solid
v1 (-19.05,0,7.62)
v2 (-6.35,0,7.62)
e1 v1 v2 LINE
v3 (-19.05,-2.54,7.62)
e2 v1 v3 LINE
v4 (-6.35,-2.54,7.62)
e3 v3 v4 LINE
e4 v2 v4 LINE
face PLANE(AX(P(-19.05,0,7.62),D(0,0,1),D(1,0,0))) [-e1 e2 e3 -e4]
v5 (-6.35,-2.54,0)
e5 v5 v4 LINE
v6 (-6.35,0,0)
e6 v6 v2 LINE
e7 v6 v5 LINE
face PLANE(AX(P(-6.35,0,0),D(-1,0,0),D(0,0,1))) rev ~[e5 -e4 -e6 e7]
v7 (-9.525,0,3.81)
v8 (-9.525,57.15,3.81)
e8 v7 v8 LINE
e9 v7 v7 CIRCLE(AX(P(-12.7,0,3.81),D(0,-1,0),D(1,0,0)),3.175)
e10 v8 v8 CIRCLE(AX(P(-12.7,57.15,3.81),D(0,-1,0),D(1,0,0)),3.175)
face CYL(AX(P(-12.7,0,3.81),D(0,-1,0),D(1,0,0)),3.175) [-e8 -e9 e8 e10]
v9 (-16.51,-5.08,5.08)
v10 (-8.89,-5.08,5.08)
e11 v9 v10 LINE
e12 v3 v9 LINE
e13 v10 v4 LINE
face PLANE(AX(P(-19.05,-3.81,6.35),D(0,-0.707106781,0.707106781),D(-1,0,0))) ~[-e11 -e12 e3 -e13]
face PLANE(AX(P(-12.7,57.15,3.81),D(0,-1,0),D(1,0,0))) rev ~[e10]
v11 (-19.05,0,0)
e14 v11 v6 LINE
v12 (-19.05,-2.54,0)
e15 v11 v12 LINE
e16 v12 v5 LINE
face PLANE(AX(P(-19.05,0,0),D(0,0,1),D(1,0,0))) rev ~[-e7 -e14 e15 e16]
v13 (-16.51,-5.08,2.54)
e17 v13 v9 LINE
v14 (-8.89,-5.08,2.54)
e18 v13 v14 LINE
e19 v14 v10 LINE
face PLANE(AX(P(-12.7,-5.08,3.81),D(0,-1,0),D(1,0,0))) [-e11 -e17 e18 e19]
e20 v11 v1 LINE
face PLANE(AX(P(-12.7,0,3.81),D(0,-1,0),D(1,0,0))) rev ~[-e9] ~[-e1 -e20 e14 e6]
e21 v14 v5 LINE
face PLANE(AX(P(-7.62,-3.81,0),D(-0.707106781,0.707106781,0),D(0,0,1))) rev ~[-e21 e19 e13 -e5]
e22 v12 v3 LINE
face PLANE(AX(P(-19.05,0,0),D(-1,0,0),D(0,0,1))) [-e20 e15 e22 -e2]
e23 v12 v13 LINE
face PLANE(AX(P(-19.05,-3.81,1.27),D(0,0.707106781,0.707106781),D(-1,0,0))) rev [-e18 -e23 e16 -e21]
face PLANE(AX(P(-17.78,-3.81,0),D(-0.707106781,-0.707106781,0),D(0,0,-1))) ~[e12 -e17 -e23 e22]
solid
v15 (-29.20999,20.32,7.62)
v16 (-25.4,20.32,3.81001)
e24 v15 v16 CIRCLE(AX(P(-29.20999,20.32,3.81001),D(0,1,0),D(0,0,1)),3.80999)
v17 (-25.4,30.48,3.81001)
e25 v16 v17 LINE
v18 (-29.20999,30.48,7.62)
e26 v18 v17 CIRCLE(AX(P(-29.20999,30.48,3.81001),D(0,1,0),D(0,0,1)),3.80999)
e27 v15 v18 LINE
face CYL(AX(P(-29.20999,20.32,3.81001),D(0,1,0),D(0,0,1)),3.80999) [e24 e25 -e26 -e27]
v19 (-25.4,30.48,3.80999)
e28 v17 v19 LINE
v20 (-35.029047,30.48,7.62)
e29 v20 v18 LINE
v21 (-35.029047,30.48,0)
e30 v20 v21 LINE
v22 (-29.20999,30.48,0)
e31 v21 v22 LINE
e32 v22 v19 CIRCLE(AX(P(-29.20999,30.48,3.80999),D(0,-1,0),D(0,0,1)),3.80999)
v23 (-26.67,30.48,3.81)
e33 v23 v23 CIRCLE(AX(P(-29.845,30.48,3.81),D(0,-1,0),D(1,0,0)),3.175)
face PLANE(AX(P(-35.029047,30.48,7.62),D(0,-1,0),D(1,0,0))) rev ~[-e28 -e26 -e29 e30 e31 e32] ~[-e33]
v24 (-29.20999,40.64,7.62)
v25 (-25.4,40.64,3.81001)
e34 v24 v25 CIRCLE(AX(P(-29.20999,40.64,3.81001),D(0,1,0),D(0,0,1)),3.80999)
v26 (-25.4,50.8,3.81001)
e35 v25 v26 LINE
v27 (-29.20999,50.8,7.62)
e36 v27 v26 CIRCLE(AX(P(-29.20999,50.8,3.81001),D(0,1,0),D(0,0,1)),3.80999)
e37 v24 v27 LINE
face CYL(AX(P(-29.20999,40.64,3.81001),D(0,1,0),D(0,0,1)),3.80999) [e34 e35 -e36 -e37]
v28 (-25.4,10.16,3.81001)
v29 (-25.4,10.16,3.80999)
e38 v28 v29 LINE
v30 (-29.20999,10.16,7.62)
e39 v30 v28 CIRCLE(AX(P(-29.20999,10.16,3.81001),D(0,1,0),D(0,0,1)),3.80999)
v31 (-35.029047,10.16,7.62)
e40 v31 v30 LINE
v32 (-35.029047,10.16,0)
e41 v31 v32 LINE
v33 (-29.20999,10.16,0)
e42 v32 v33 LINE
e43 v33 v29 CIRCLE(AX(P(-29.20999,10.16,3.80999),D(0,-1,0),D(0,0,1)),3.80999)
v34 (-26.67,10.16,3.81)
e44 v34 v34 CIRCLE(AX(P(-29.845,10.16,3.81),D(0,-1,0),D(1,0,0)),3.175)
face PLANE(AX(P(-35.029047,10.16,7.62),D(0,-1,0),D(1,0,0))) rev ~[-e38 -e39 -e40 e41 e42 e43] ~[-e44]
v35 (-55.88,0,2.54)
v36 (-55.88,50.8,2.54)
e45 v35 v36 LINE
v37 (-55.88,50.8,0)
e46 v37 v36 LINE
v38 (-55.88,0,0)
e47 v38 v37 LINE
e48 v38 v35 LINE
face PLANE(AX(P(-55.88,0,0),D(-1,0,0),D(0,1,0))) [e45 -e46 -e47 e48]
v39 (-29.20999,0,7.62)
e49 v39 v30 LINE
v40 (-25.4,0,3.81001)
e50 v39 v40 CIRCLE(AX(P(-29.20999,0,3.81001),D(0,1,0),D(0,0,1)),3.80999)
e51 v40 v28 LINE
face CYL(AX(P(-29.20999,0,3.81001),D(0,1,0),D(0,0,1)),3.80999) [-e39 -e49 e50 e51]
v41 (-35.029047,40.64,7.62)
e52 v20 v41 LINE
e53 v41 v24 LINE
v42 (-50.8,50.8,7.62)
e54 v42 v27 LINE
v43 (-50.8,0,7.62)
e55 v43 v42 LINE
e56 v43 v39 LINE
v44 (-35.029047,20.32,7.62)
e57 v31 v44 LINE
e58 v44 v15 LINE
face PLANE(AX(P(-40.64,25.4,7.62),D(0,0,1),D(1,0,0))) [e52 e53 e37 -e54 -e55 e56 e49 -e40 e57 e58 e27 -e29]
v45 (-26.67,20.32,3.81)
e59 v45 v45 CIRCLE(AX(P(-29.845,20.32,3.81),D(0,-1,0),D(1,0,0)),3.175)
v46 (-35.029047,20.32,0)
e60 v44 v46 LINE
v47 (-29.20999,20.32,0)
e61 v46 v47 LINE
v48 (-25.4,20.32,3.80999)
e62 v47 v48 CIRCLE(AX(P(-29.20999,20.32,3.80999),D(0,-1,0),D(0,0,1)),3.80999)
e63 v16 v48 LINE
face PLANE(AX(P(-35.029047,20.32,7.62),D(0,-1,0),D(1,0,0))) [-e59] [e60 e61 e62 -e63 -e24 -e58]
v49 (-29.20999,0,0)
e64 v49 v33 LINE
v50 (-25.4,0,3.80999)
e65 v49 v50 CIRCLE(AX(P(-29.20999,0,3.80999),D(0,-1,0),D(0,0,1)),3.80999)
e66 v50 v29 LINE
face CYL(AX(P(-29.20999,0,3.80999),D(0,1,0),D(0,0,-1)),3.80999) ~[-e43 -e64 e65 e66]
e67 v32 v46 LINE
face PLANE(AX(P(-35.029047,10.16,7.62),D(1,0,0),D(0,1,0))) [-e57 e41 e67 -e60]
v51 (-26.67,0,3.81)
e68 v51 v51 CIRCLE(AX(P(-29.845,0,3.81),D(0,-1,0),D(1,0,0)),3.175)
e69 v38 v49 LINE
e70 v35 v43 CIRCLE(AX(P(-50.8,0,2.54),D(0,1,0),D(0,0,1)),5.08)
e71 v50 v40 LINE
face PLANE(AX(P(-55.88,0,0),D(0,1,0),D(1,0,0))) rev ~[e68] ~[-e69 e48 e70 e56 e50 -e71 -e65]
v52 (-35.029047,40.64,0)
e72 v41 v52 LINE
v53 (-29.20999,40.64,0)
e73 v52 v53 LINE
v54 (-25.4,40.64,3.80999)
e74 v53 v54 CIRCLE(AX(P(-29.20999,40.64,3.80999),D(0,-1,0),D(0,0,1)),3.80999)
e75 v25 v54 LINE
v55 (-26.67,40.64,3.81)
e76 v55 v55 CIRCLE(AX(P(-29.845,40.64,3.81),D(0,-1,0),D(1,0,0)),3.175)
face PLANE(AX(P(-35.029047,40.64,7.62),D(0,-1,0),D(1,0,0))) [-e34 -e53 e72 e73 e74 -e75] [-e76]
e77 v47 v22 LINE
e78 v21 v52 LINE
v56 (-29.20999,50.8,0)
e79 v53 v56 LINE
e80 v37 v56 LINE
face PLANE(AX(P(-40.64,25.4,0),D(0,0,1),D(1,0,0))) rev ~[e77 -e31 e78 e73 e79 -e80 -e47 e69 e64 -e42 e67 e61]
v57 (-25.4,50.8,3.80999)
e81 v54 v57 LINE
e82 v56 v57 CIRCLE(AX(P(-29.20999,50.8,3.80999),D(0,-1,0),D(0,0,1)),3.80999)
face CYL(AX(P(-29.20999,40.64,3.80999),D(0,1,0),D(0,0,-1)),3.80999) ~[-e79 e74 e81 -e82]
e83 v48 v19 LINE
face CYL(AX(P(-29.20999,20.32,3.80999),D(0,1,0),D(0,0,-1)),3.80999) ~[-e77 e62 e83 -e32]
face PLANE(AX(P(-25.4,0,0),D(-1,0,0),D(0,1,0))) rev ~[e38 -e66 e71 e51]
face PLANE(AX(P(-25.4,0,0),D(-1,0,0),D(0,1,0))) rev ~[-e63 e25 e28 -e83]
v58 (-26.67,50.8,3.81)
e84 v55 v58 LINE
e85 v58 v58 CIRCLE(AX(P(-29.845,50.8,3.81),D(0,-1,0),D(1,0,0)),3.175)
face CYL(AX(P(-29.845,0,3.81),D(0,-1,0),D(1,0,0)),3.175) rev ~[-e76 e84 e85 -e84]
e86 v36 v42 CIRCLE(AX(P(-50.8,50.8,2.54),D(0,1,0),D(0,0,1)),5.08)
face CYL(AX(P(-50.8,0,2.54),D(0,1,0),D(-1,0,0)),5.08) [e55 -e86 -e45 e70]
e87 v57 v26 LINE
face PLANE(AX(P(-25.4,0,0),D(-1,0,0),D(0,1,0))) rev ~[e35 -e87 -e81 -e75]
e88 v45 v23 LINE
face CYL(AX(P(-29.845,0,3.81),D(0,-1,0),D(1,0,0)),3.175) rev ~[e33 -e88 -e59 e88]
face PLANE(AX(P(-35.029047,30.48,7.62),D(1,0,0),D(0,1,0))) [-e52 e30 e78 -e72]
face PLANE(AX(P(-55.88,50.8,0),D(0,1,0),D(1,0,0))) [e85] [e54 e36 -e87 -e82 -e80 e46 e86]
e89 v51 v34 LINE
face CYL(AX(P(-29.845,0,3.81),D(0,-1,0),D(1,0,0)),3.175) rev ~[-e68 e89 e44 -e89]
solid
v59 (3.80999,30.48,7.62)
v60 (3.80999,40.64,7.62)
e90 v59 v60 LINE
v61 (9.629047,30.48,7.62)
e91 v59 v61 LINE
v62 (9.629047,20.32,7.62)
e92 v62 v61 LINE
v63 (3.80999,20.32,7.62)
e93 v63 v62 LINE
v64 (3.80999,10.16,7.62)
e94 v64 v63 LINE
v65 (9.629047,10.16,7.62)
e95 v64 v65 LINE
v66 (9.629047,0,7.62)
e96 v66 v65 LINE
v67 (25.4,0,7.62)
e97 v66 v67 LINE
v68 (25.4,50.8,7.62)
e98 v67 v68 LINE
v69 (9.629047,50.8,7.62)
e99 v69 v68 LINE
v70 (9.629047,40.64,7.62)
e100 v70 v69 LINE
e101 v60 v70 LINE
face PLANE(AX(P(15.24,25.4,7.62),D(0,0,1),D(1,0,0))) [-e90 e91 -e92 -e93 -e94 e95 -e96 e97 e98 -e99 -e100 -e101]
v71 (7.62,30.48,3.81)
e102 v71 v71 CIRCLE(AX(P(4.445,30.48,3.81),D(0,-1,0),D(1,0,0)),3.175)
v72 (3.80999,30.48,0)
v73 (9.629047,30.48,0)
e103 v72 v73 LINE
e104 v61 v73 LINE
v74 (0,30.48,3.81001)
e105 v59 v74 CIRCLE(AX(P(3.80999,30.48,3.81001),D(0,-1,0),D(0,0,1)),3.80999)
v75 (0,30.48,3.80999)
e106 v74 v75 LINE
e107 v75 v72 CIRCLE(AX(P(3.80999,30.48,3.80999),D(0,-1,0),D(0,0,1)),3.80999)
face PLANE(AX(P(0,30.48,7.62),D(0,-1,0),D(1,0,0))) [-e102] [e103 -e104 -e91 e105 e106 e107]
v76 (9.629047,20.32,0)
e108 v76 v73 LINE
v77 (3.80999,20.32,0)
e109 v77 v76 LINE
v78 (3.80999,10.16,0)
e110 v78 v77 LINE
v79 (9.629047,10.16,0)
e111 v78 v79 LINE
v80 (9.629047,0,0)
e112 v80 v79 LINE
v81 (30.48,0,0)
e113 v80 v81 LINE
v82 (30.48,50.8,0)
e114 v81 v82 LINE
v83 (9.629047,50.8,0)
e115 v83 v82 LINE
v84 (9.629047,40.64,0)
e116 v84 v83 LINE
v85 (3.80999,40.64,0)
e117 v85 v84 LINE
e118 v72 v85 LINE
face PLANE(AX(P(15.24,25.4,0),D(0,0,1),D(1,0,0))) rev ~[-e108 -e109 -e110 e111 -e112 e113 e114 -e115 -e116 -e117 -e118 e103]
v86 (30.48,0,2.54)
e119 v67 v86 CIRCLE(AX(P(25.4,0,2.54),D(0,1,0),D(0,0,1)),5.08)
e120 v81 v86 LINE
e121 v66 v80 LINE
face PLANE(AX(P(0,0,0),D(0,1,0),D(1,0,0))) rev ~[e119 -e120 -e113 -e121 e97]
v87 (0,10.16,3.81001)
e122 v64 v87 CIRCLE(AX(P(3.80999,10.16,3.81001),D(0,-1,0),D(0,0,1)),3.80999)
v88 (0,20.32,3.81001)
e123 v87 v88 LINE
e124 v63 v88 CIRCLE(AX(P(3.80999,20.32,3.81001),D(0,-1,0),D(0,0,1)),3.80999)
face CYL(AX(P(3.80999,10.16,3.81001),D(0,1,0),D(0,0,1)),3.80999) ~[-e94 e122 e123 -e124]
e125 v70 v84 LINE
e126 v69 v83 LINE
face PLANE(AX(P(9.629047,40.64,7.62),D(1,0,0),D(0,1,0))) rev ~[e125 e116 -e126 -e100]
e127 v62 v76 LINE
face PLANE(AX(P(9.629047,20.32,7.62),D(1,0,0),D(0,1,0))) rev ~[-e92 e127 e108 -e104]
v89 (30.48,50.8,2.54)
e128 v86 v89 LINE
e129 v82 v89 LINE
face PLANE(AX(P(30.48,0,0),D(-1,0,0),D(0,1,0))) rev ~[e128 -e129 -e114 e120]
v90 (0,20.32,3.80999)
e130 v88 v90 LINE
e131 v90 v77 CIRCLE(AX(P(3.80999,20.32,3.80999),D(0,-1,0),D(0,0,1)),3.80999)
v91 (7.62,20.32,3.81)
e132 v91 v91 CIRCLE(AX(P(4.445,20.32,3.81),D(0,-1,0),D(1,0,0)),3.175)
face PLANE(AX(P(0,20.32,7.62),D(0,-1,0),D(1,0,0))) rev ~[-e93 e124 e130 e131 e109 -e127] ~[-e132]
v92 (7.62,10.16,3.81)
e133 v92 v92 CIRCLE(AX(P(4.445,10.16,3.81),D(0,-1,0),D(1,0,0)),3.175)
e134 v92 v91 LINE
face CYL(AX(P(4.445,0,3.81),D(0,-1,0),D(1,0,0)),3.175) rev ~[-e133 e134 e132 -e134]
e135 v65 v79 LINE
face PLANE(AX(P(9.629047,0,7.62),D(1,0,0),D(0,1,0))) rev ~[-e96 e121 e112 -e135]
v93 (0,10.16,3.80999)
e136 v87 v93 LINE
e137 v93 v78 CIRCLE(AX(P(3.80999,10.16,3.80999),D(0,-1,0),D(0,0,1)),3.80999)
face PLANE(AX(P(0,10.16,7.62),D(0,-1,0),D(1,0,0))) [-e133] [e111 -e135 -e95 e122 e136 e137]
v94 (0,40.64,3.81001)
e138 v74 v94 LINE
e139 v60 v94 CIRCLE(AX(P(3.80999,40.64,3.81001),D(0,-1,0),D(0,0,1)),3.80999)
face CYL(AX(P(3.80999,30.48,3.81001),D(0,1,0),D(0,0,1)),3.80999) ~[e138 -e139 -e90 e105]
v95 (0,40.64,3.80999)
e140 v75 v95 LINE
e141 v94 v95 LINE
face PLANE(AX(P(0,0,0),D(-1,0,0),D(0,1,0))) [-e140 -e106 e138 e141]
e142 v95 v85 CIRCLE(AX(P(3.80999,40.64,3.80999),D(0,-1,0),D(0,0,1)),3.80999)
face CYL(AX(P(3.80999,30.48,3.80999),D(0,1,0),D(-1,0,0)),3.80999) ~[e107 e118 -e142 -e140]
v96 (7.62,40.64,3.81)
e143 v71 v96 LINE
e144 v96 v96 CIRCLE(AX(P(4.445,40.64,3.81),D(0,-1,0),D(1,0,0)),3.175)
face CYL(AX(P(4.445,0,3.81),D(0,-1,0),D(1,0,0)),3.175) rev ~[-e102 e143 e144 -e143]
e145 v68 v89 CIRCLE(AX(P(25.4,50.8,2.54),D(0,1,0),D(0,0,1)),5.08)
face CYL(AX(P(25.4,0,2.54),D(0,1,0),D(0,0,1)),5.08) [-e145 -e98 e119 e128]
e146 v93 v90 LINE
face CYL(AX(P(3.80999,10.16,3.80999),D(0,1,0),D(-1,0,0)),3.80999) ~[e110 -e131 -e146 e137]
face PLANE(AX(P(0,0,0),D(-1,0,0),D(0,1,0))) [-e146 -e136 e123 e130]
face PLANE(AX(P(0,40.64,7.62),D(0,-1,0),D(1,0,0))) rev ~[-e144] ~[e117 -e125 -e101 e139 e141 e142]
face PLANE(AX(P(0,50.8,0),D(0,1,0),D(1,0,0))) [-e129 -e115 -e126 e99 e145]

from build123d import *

# Parameters (mm, degrees)
F0_W      = 30.48
F0_H      = 50.8
F1_DEPTH  = 7.62
F2_R      = 3.175
F3_DEPTH  = 50.8
F4_W      = 9.6290465444
F4_H      = 10.16
F5_DEPTH  = 7.62
F6_DEPTH  = 7.62
F7_R      = 5.08
F7_2_R    = 5.08
F8_R      = 3.80999
F8_2_R    = 3.80999
F9_W      = 12.7
F9_H      = 7.62
F9_R      = 3.175
F10_DEPTH = 5.08
F11_DEPTH = 57.15
F12_SIZE  = 2.54


# Not quite as in the source:
# - a fillet or chamfer is up to 0.001 mm smaller than in the source, because OpenCascade refuses the exact size


with BuildPart() as f1:
    # F0 (on Top) → F1 (new body)
    with BuildSketch(Plane.XY):
        with Locations((15.24, 25.4)):
            Rectangle(F0_W, F0_H)
    extrude(amount=F1_DEPTH)


with BuildPart() as f1b:
    # F0 (on Top) → F1, piece 2 (new body)
    with BuildSketch(Plane.XY):
        with Locations((-40.64, 25.4)):
            Rectangle(F0_W, F0_H)
    extrude(amount=F1_DEPTH)


with BuildPart() as f3_tool:
    # F2 (on face) → F3 (new body, through all)
    with BuildSketch(Plane.XZ):
        with Locations((4.445, 3.81)):
            Circle(F2_R)
        with Locations((-29.845, 3.81)):
            Circle(F2_R)
    extrude(amount=-F3_DEPTH)


with BuildPart() as f1_1:
    add(f1.part)

    # F3: cut by f3_tool
    add(f3_tool.part, mode=Mode.SUBTRACT)

    # F4 (on face) → F5 (cut, through all)
    with BuildSketch(Plane.XY.offset(7.62)):
        with Locations((4.8145232722, 5.08)):
            Rectangle(F4_W, F4_H)
        with Locations((4.8145232722, 25.4)):
            Rectangle(F4_W, F4_H)
        with Locations((4.8145232722, 45.72)):
            Rectangle(F4_W, F4_H)
    extrude(amount=-F5_DEPTH, mode=Mode.SUBTRACT)

    # F7#2
    f7_2_edges = [f1_1.edges().sort_by_distance(p)[0] for p in [
        (30.48, 25.4, 7.62),
    ]]
    fillet(f7_2_edges, radius=F7_2_R)

    # F8 (radius 3.81 in the source; OpenCascade refuses exactly that, so slightly less here)
    f8_edges = [f1_1.edges().sort_by_distance(p)[0] for p in [
        (0, 15.24, 7.62),
        (0, 15.24, 0),
        (0, 35.56, 7.62),
        (0, 35.56, 0),
    ]]
    fillet(f8_edges, radius=F8_R)


with BuildPart() as f1b_1:
    add(f1b.part)

    # F3: cut by f3_tool
    add(f3_tool.part, mode=Mode.SUBTRACT)

    # F4 (on face) → F6 (cut, through all)
    with BuildSketch(Plane.XY.offset(7.62)):
        with Locations((-30.2145232722, 15.24)):
            Rectangle(F4_W, F4_H)
        with Locations((-30.2145232722, 35.56)):
            Rectangle(F4_W, F4_H)
    extrude(amount=-F6_DEPTH, mode=Mode.SUBTRACT)

    # F7
    f7_edges = [f1b_1.edges().sort_by_distance(p)[0] for p in [
        (-55.88, 25.4, 7.62),
    ]]
    fillet(f7_edges, radius=F7_R)

    # F8#2 (radius 3.81 in the source; OpenCascade refuses exactly that, so slightly less here)
    f8_2_edges = [f1b_1.edges().sort_by_distance(p)[0] for p in [
        (-25.4, 5.08, 0),
        (-25.4, 5.08, 7.62),
        (-25.4, 25.4, 0),
        (-25.4, 25.4, 7.62),
        (-25.4, 45.72, 0),
        (-25.4, 45.72, 7.62),
    ]]
    fillet(f8_2_edges, radius=F8_2_R)


with BuildPart() as f10:
    # F9 (on face) → F10 (new body)
    with BuildSketch(Plane.XZ):
        with Locations((-12.7, 3.81)):
            Rectangle(F9_W, F9_H)
        with Locations((-12.7, 3.81)):
            Circle(F9_R, mode=Mode.SUBTRACT)
        with Locations((-12.7, 3.81)):
            Circle(F9_R)
    extrude(amount=F10_DEPTH)

    # F9 (on face) → F11 (join)
    with BuildSketch(Plane.XZ):
        with Locations((-12.7, 3.81)):
            Circle(F9_R)
    extrude(amount=-F11_DEPTH)

    # F12
    f12_edges = [f10.edges().sort_by_distance(p)[0] for p in [
        (-6.35, -5.08, 3.81),
        (-12.7, -5.08, 7.62),
        (-19.05, -5.08, 3.81),
        (-12.7, -5.08, 0),
    ]]
    chamfer(f12_edges, length=F12_SIZE)


solid = Compound([f1_1.part, f1b_1.part, f10.part])
